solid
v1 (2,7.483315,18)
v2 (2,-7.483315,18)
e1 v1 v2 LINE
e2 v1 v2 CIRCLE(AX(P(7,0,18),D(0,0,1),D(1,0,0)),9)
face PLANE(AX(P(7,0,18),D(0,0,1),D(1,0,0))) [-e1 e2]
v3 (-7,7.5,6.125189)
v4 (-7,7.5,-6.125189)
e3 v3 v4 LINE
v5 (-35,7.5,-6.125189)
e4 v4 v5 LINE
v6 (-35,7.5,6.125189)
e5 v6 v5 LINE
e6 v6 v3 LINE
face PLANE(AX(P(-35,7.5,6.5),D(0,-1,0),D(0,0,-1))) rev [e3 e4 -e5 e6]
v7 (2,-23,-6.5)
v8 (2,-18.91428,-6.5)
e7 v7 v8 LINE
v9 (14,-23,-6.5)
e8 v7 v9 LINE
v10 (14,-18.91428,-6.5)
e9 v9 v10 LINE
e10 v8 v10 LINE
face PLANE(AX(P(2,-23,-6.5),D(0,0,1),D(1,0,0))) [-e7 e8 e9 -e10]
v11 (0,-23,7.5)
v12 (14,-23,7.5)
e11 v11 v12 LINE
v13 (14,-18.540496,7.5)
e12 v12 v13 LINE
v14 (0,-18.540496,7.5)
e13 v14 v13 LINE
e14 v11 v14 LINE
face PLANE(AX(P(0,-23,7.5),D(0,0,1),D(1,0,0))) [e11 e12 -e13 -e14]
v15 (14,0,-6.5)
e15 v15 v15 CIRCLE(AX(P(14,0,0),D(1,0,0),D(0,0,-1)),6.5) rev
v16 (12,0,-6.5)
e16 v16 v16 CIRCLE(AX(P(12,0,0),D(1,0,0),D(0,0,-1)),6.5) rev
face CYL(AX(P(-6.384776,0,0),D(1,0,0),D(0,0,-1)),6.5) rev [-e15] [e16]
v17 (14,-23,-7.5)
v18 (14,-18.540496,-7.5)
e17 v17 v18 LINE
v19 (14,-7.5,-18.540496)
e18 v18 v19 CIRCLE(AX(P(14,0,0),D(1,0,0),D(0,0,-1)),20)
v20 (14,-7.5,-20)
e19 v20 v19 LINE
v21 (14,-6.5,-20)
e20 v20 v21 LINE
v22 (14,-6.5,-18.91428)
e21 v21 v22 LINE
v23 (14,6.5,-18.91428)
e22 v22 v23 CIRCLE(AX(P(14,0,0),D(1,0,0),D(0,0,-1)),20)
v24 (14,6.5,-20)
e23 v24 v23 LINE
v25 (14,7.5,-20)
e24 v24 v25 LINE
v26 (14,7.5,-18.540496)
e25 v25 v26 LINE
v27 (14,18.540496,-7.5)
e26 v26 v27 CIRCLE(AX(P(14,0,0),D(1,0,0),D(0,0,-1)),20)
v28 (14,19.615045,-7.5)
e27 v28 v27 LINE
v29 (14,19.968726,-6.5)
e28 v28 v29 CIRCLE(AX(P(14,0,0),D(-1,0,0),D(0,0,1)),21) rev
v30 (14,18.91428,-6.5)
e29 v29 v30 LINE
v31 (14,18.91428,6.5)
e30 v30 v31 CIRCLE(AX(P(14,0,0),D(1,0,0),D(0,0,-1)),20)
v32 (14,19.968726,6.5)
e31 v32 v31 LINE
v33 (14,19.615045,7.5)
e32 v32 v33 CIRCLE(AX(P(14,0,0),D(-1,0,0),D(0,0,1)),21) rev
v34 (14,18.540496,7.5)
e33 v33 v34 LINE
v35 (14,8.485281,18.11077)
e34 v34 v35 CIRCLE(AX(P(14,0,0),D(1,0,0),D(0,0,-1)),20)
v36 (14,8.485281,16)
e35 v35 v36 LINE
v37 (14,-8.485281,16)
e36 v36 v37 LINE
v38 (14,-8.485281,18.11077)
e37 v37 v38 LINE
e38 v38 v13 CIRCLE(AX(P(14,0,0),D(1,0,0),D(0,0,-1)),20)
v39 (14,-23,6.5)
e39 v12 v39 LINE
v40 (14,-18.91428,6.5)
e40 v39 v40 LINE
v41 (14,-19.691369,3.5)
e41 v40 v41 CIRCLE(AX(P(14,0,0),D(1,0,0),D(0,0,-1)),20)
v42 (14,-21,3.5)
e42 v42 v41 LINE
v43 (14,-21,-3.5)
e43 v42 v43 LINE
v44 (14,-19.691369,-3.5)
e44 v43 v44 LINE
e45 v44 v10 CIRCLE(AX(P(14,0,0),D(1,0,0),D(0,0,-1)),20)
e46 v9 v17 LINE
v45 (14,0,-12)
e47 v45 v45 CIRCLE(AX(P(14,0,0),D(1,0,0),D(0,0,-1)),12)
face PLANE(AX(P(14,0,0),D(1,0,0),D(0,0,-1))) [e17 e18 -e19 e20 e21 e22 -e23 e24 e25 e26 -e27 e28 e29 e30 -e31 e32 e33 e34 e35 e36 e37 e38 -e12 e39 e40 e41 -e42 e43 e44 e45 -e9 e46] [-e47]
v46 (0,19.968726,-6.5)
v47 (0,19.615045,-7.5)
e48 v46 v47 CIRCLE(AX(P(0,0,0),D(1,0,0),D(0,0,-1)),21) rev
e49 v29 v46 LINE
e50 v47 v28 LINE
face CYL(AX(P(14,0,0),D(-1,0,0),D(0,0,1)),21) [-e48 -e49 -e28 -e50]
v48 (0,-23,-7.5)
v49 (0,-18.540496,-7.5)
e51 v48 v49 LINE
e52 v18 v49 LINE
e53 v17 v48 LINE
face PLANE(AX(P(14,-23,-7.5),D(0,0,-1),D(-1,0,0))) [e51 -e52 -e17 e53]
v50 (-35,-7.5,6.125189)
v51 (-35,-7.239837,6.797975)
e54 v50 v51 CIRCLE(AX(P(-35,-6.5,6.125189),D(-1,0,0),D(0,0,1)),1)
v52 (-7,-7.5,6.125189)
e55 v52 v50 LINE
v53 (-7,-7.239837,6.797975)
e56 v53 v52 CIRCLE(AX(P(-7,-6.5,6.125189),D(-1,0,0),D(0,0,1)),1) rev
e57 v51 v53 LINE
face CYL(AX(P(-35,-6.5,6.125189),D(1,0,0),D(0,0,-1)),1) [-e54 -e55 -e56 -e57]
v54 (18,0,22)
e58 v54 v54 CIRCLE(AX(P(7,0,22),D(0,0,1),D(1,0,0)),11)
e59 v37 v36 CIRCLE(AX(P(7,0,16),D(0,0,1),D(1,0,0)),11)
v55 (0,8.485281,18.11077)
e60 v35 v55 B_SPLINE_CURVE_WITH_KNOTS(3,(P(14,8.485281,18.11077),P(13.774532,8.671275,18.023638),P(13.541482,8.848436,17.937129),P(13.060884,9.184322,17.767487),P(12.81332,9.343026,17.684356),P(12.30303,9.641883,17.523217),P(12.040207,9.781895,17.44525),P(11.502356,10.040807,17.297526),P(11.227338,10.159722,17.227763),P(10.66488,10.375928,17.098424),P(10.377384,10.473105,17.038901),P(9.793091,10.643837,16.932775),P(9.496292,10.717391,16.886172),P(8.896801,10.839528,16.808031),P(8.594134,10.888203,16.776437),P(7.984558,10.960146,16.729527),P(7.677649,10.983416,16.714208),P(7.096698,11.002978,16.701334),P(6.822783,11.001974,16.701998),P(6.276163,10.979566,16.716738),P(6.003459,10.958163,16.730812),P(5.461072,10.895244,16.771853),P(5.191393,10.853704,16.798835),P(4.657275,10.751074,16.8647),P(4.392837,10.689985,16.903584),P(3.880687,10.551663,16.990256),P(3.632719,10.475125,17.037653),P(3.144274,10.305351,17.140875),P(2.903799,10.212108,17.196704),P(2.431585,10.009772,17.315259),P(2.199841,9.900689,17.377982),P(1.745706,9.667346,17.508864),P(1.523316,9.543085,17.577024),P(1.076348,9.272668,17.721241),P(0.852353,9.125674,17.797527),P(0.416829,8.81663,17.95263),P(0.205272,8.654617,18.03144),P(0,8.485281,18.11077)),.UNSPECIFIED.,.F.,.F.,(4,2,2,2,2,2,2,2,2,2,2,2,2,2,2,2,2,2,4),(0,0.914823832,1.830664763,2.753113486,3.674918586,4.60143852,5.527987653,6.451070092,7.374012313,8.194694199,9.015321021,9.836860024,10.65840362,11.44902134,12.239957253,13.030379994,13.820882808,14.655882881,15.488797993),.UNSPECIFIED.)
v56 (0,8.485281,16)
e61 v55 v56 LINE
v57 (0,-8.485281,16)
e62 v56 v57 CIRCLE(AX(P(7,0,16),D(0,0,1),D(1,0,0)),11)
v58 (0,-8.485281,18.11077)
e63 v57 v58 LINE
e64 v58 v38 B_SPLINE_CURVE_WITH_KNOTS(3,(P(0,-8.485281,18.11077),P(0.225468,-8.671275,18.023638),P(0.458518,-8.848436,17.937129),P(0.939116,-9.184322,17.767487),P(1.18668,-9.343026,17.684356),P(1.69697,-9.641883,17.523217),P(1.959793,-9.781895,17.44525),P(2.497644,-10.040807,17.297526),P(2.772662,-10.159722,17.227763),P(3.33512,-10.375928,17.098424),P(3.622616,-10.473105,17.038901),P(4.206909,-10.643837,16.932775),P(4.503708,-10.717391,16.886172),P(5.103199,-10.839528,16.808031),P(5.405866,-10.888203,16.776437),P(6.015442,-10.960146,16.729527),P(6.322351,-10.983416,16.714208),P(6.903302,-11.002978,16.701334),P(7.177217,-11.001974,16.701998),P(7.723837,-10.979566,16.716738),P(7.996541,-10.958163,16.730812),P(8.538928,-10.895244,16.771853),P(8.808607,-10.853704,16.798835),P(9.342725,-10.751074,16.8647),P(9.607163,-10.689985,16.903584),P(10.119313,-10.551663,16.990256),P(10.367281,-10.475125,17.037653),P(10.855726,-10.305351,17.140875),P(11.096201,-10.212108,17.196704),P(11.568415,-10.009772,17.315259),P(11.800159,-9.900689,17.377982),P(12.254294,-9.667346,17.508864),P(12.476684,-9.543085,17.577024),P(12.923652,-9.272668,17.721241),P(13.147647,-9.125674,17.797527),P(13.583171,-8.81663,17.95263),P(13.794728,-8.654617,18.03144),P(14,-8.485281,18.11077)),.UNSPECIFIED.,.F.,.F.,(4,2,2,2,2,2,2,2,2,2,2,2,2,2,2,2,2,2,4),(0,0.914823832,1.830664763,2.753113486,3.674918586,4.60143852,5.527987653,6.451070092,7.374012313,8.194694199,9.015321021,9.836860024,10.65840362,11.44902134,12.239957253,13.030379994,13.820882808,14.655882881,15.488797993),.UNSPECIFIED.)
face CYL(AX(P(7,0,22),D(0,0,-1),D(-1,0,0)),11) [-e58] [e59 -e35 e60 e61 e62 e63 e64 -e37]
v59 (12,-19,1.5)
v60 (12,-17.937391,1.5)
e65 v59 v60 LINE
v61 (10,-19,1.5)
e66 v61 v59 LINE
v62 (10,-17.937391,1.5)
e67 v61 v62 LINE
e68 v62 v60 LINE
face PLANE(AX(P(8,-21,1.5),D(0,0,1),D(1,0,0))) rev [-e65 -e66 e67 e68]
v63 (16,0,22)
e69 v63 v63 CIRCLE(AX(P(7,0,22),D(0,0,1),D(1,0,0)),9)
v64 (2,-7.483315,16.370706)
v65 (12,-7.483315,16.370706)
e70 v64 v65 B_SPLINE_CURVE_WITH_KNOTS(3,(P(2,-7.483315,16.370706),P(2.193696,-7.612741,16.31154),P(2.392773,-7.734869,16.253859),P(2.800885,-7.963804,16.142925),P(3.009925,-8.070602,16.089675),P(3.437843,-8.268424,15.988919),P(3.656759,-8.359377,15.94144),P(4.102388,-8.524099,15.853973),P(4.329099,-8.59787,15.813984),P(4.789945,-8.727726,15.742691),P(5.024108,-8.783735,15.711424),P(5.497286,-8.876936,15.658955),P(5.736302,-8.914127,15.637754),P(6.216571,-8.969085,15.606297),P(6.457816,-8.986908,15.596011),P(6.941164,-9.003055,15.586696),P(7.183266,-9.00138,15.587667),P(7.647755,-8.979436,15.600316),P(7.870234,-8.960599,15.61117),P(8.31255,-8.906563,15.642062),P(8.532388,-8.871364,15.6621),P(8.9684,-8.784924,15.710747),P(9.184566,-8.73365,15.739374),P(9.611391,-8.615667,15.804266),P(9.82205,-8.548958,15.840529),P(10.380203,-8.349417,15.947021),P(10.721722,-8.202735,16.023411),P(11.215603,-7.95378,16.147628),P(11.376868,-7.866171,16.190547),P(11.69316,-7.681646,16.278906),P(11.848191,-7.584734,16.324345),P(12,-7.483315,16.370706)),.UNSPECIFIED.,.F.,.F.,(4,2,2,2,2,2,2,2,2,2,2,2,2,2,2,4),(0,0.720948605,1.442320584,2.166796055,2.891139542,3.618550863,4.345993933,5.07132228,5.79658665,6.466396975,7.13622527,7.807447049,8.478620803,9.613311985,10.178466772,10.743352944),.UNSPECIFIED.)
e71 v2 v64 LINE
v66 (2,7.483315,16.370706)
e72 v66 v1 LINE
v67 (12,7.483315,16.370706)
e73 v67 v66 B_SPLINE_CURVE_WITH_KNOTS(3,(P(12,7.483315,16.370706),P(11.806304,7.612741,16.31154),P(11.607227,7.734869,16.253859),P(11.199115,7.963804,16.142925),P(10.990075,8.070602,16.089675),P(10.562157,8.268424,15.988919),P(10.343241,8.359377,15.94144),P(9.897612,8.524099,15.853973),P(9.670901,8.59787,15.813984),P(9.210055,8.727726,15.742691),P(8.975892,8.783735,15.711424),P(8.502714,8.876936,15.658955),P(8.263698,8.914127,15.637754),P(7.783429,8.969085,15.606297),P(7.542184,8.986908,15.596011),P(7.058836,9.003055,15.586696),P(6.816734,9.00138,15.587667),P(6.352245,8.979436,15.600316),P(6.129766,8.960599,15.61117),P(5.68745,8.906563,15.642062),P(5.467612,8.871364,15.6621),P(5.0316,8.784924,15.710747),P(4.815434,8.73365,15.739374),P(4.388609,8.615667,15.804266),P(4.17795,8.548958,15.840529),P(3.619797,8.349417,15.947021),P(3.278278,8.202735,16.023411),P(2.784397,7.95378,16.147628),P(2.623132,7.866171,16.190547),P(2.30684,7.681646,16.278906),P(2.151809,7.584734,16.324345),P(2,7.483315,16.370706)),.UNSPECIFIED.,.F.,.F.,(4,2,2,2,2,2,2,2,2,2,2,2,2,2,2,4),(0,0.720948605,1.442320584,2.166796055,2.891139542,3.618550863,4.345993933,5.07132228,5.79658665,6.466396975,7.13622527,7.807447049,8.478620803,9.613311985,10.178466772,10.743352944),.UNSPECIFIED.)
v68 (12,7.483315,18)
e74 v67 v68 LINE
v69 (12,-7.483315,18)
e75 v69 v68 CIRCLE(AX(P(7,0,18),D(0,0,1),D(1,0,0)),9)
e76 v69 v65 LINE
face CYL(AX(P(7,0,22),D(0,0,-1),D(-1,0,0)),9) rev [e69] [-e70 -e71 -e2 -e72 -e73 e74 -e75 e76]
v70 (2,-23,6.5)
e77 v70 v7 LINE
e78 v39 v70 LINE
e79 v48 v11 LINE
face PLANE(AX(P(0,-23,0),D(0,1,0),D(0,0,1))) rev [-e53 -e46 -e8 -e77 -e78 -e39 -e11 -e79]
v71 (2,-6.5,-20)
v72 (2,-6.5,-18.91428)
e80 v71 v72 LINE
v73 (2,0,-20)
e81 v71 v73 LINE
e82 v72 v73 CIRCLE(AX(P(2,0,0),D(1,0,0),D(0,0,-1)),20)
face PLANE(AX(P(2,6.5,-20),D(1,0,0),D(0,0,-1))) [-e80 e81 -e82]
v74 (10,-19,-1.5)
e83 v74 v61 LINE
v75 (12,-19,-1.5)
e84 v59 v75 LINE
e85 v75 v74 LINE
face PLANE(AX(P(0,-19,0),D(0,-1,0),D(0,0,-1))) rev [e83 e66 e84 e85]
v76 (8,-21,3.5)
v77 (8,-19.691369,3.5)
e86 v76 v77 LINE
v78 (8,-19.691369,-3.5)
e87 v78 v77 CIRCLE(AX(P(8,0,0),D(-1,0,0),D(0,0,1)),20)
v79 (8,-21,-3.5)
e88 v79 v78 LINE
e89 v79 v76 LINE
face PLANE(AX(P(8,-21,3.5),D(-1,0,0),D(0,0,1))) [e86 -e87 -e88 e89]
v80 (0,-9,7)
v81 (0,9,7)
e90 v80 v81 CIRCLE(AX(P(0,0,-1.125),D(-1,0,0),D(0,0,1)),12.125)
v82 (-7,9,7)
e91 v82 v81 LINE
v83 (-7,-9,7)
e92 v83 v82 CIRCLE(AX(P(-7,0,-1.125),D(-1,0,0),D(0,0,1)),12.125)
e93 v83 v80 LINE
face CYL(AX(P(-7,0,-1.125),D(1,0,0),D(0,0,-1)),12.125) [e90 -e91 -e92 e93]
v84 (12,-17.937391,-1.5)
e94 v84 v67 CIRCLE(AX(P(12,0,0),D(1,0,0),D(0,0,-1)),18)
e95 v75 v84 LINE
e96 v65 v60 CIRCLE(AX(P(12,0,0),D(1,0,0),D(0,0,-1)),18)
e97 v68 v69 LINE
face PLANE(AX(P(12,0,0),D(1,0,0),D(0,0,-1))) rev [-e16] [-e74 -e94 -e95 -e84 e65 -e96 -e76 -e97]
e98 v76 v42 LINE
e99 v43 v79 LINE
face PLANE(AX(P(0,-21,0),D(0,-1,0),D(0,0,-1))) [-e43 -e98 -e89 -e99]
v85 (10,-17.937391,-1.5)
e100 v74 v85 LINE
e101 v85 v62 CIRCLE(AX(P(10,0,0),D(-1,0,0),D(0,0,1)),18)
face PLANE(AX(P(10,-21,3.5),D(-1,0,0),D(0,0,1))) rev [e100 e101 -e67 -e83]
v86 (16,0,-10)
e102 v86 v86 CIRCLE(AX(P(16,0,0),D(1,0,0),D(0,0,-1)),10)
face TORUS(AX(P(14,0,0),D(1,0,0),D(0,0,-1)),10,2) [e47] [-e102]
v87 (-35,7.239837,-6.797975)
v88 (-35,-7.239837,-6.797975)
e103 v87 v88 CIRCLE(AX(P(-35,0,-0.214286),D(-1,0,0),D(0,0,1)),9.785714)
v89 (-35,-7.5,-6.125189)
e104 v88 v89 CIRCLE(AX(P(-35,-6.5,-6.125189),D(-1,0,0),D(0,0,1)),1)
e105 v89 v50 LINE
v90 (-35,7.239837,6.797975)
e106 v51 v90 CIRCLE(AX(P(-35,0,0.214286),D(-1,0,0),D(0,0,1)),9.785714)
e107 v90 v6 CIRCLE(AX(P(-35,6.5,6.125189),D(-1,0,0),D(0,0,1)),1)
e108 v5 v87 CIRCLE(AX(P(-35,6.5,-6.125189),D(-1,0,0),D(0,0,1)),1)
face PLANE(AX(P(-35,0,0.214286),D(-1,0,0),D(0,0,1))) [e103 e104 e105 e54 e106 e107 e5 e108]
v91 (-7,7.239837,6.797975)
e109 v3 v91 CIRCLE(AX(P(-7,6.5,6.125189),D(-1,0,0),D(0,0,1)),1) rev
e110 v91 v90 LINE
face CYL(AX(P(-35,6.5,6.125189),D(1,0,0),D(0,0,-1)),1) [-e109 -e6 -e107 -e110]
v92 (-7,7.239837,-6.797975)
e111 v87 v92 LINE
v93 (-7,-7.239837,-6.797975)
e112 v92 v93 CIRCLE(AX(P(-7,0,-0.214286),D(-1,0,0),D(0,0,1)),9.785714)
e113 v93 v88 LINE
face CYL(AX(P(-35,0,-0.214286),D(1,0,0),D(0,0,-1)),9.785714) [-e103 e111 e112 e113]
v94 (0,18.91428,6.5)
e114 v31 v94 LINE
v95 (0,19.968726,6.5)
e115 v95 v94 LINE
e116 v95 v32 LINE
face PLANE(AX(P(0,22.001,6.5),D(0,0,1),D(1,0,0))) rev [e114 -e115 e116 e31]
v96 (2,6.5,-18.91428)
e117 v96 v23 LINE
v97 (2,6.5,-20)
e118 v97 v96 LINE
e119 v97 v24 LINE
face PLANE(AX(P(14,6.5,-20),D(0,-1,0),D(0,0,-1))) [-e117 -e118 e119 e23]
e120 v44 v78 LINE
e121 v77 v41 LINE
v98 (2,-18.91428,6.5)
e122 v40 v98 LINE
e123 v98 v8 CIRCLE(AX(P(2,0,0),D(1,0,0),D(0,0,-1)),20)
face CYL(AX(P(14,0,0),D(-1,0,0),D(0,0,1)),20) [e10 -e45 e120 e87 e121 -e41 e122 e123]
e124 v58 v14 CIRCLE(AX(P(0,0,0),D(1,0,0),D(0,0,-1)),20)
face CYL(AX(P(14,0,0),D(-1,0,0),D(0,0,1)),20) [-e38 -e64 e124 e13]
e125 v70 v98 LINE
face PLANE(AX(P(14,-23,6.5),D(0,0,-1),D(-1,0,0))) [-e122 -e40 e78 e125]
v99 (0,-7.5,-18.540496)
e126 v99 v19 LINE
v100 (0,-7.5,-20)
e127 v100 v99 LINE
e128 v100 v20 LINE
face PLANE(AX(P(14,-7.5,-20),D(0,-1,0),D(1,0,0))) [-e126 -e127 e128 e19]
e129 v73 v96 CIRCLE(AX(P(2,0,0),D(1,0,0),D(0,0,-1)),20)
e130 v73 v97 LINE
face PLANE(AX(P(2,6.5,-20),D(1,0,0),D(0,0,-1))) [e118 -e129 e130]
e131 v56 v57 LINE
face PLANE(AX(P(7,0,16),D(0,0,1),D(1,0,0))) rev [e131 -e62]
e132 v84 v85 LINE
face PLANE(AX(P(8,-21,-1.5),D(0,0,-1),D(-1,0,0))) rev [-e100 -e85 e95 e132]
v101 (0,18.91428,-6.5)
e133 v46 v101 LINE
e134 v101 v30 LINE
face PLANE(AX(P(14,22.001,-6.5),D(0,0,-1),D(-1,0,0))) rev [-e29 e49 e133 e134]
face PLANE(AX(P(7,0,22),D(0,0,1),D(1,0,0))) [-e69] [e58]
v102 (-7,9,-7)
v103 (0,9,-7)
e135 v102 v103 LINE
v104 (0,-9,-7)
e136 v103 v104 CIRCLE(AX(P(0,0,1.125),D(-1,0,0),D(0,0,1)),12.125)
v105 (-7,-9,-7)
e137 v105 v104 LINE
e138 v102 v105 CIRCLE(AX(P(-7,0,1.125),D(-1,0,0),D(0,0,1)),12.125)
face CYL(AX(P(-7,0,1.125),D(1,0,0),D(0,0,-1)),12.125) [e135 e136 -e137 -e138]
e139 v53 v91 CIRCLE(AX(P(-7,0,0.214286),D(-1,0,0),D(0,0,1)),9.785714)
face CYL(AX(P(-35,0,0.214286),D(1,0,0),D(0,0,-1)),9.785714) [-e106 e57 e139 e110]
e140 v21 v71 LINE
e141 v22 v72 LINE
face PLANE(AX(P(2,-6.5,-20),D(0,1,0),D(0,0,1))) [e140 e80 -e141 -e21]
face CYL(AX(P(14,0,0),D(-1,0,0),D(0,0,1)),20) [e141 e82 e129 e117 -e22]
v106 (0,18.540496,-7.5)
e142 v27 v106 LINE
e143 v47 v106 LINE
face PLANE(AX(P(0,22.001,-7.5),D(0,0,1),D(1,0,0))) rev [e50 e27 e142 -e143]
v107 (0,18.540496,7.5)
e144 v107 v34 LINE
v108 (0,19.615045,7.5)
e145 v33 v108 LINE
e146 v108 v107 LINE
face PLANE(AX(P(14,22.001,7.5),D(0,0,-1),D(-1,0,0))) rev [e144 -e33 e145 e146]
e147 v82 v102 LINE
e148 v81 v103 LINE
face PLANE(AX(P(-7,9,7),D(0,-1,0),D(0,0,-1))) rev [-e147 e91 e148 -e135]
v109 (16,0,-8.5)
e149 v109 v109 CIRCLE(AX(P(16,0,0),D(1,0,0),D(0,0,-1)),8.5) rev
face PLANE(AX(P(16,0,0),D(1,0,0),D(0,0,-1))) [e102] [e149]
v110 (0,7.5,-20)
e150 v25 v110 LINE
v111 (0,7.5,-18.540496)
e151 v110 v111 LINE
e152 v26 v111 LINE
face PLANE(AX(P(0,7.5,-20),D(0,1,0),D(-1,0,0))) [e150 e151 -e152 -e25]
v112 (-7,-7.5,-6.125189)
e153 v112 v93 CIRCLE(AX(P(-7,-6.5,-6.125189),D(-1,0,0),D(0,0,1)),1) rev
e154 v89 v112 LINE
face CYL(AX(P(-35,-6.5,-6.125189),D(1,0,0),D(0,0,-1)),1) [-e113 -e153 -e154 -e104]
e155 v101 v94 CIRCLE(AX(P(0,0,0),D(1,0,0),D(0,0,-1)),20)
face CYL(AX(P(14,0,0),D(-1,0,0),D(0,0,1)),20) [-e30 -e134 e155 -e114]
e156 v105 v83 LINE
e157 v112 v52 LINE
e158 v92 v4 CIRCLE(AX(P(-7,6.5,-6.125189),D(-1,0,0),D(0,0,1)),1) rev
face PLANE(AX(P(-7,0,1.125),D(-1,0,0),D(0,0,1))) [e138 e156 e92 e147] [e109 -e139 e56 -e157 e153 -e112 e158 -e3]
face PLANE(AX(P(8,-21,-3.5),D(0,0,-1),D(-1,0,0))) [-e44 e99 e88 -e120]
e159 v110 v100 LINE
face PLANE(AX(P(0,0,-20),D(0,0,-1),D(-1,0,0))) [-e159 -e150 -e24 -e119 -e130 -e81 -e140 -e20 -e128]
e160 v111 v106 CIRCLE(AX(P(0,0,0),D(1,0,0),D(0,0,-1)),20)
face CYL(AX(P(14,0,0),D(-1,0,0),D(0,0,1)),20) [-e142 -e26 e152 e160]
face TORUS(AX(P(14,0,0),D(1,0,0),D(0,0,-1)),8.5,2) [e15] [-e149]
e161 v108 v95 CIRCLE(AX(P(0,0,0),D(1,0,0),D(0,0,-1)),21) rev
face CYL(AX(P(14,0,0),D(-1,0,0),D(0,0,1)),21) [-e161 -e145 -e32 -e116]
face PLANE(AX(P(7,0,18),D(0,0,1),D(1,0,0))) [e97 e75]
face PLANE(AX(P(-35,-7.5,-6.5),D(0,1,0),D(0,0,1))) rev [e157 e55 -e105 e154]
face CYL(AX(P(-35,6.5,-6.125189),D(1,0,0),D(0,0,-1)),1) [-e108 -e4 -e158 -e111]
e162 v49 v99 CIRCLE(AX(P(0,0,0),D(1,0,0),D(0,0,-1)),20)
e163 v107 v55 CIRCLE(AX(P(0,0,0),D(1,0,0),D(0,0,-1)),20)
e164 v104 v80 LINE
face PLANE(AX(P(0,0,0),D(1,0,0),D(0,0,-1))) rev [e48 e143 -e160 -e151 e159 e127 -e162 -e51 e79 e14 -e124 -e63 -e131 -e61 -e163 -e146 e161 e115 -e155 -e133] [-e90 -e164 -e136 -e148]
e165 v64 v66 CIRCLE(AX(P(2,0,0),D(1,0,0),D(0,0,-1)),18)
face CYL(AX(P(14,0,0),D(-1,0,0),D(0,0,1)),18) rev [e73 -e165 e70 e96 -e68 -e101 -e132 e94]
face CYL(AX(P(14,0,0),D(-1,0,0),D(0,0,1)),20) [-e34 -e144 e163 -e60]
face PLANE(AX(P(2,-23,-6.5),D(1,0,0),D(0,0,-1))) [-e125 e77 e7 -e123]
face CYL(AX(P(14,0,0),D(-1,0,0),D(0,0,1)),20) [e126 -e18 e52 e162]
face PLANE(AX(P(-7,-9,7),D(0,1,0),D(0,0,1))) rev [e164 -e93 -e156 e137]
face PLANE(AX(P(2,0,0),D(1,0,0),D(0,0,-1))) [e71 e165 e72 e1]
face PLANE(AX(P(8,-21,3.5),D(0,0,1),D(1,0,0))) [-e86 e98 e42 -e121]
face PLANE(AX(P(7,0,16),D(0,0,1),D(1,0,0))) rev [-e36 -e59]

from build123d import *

# Parameters (mm, degrees)
SKETCH2_R                = 20
BOSS_EXTRUDE1_DEPTH      = 14
SKETCH3_R                = 12
SKETCH3_R_2              = 6.5
EXTRUDE_THIN1_DEPTH      = 2
FILLET1_R                = 2
BOSS_EXTRUDE4_REACH      = 34.496
BOSS_EXTRUDE4_END_RADIUS = 21
SKETCH4_W                = 14
SKETCH4_H                = 1
BOSS_EXTRUDE5_DEPTH      = 23
SKETCH6_W                = 6
SKETCH6_H                = 7
BOSS_EXTRUDE6_DEPTH      = 21
BOSS_EXTRUDE7_DEPTH      = 20
BOSS_EXTRUDE8_START      = 16
SKETCH8_R                = 11
BOSS_EXTRUDE8_DEPTH      = 6
SHELL1_START             = 10
SHELL1_DEPTH             = 2
SHELL1_START_2           = -1.5
SHELL1_2_DEPTH           = 23.5
SHELL1_START_3           = 18
SHELL1_3_DEPTH           = 4
SHELL1_START_4           = 2
SHELL1_4_DEPTH           = 10
CUT_EXTRUDE1_REACH       = 38.565
BOSS_EXTRUDE9_DEPTH      = 7
BOSS_EXTRUDE10_DEPTH     = 28
FILLET2_R                = 1


with BuildPart() as part:
    # Sketch2 → Boss-Extrude1 (new body)
    with BuildSketch(Plane(origin=(0, 0, 0), x_dir=(0, 0, -1), z_dir=(1, 0, 0))):
        Circle(SKETCH2_R)
    extrude(amount=BOSS_EXTRUDE1_DEPTH)

    # Sketch3 → Extrude-Thin1 (add)
    with BuildSketch(Plane(origin=(14, 0, 0), x_dir=(0, 0, -1), z_dir=(1, 0, 0))):
        Circle(SKETCH3_R)
        Circle(SKETCH3_R_2, mode=Mode.SUBTRACT)
    extrude(amount=EXTRUDE_THIN1_DEPTH)

    # Fillet1
    fillet1_edges = [part.edges().sort_by_distance(p)[0] for p in [
        (16, 0, 12),
        (16, 0, 6.5),
    ]]
    fillet(fillet1_edges, radius=FILLET1_R - 0.0001)  # a hair under: the kernel refuses the full size

    # Boss-Extrude4: up to this cylinder (the profile starts inside it)
    boss_extrude4_end = Plane(origin=(7, 0, 0), z_dir=(-1, 0, 0)) * Cylinder(BOSS_EXTRUDE4_END_RADIUS, 111.992, mode=Mode.PRIVATE)
    # Sketch4 → Boss-Extrude4 (add, up to the surface)
    with BuildSketch(Plane(origin=(0, 0, 0), x_dir=(1, 0, 0), z_dir=(0, 1, 0)), mode=Mode.PRIVATE) as boss_extrude4_sk1:
        with Locations((7, 7)):
            Rectangle(SKETCH4_W, SKETCH4_H)
    boss_extrude4_tool1 = extrude(boss_extrude4_sk1.sketch, amount=BOSS_EXTRUDE4_REACH, mode=Mode.PRIVATE) & boss_extrude4_end
    add(boss_extrude4_tool1.solids().sort_by_distance((7, 0, -7))[0])
    # Sketch4 → Boss-Extrude4 (add, up to the surface)
    with BuildSketch(Plane(origin=(0, 0, 0), x_dir=(1, 0, 0), z_dir=(0, 1, 0)), mode=Mode.PRIVATE) as boss_extrude4_sk2:
        with Locations((7, -7)):
            Rectangle(SKETCH4_W, SKETCH4_H)
    boss_extrude4_tool2 = extrude(boss_extrude4_sk2.sketch, amount=BOSS_EXTRUDE4_REACH, mode=Mode.PRIVATE) & boss_extrude4_end
    add(boss_extrude4_tool2.solids().sort_by_distance((7, 0, 7))[0])

    # Sketch5 → Boss-Extrude5 (add)
    with BuildSketch(Plane(origin=(0, 0, 0), x_dir=(1, 0, 0), z_dir=(0, 1, 0))):
        Polygon((2, 6.5), (2, -6.5), (14, -6.5), (14, -7.5), (0, -7.5), (0, 7.5), (14, 7.5), (14, 6.5), align=None)
    extrude(amount=-BOSS_EXTRUDE5_DEPTH)

    # Sketch6 → Boss-Extrude6 (add)
    with BuildSketch(Plane(origin=(0, 0, 0), x_dir=(1, 0, 0), z_dir=(0, 1, 0))):
        with Locations((11, 0)):
            Rectangle(SKETCH6_W, SKETCH6_H)
    extrude(amount=-BOSS_EXTRUDE6_DEPTH)

    # Sketch7 → Boss-Extrude7 (add)
    with BuildSketch(Plane.XY):
        Polygon((0, 7.5), (14, 7.5), (14, 6.5), (2, 6.5), (2, -6.5), (14, -6.5), (14, -7.5), (0, -7.5), align=None)
    extrude(amount=-BOSS_EXTRUDE7_DEPTH)

    # Sketch8 → Boss-Extrude8 (add)
    with BuildSketch(Plane.XY.offset(BOSS_EXTRUDE8_START)):
        with Locations(Location((7, 0, 0), (0, 0, 129.521196359))):
            Circle(SKETCH8_R)
    extrude(amount=BOSS_EXTRUDE8_DEPTH)

    # Shell1: read off the stored shape, not the designer's step
    # Shell1 outline → Shell1 (cut)
    with BuildSketch(Plane.YZ.offset(SHELL1_START)):
        with BuildLine():
            Line((-19, -1.5), (-17.937391115, -1.5))
            ThreePointArc((-17.937391115, -1.5), (-18, 0), (-17.937391115, 1.5))
            Line((-17.937391115, 1.5), (-19, 1.5))
            Line((-19, 1.5), (-19, -1.5))
        make_face()
    extrude(amount=SHELL1_DEPTH, mode=Mode.SUBTRACT)

    # Shell1 2 outline → Shell1 2 (cut)
    with BuildSketch(Plane.XY.offset(SHELL1_START_2)):
        with BuildLine():
            Line((2, 7.483314774), (2, -7.483314774))
            ThreePointArc((2, -7.483314774), (7, -9), (12, -7.483314774))
            Line((12, -7.483314774), (12, 7.483314774))
            ThreePointArc((12, 7.483314774), (7, 9), (2, 7.483314774))
        make_face()
    extrude(amount=SHELL1_2_DEPTH, mode=Mode.SUBTRACT)

    # Shell1 3 outline → Shell1 3 (cut)
    with BuildSketch(Plane.XY.offset(SHELL1_START_3)):
        with BuildLine():
            ThreePointArc((2, 7.483314774), (-2, 0), (2, -7.483314774))
            Line((2, -7.483314774), (2, 7.483314774))
        make_face()
        with BuildLine():
            Line((12, 7.483314774), (12, -7.483314774))
            ThreePointArc((12, -7.483314774), (16, 0), (12, 7.483314774))
        make_face()
    extrude(amount=SHELL1_3_DEPTH, mode=Mode.SUBTRACT)

    # Shell1 4 outline → Shell1 4 (cut)
    with BuildSketch(Plane.YZ.offset(SHELL1_START_4)):
        with BuildLine():
            Line((7.483314774, 16.370705544), (3.91902534, 18))
            Line((3.91902534, 18), (-3.91902534, 18))
            Line((-3.91902534, 18), (-7.483314774, 16.370705544))
            ThreePointArc((-7.483314774, 16.370705544), (0, -18), (7.483314774, 16.370705544))
        make_face()
    extrude(amount=SHELL1_4_DEPTH, mode=Mode.SUBTRACT)

    # Sketch9 → Cut-Extrude1 (cut, up to next)
    with BuildSketch(Plane(origin=(14, 0, 0), x_dir=(0, 0, -1), z_dir=(1, 0, 0)), mode=Mode.PRIVATE) as cut_extrude1_sk1:
        with BuildLine():
            ThreePointArc((0, 6.5), (-4.596194078, 4.596194078), (-6.5, 0))
            ThreePointArc((-6.5, 0), (-4.596194078, -4.596194078), (0, -6.5))
            ThreePointArc((0, -6.5), (4.596194078, -4.596194078), (6.5, 0))
            ThreePointArc((6.5, 0), (4.596194078, 4.596194078), (0, 6.5))
        make_face()
    cut_extrude1_tool1 = extrude(cut_extrude1_sk1.sketch, amount=-CUT_EXTRUDE1_REACH, mode=Mode.PRIVATE) & part.part
    add(cut_extrude1_tool1.solids().sort_by_distance((14, 0, 0))[0], mode=Mode.SUBTRACT)

    # Sketch10 → Boss-Extrude9 (add)
    with BuildSketch(Plane.ZY):
        with BuildLine():
            Line((7, 9), (-7, 9))
            ThreePointArc((-7, 9), (-11, 0), (-7, -9))
            Line((-7, -9), (7, -9))
            ThreePointArc((7, -9), (11, 0), (7, 9))
        make_face()
    extrude(amount=BOSS_EXTRUDE9_DEPTH)

    # Sketch11 → Boss-Extrude10 (add)
    with BuildSketch(Plane.ZY.offset(7)):
        with BuildLine():
            Line((-6.5, -7.5), (6.5, -7.5))
            ThreePointArc((6.5, -7.5), (10, 0), (6.5, 7.5))
            Line((6.5, 7.5), (-6.5, 7.5))
            ThreePointArc((-6.5, 7.5), (-10, 0), (-6.5, -7.5))
        make_face()
    extrude(amount=BOSS_EXTRUDE10_DEPTH)

    # Fillet2
    fillet2_edges = [part.edges().sort_by_distance(p)[0] for p in [
        (-21, -7.5, 6.5),
        (-21, 7.5, 6.5),
        (-21, 7.5, -6.5),
        (-21, -7.5, -6.5),
    ]]
    fillet(fillet2_edges, radius=FILLET2_R)


solid = part.part
